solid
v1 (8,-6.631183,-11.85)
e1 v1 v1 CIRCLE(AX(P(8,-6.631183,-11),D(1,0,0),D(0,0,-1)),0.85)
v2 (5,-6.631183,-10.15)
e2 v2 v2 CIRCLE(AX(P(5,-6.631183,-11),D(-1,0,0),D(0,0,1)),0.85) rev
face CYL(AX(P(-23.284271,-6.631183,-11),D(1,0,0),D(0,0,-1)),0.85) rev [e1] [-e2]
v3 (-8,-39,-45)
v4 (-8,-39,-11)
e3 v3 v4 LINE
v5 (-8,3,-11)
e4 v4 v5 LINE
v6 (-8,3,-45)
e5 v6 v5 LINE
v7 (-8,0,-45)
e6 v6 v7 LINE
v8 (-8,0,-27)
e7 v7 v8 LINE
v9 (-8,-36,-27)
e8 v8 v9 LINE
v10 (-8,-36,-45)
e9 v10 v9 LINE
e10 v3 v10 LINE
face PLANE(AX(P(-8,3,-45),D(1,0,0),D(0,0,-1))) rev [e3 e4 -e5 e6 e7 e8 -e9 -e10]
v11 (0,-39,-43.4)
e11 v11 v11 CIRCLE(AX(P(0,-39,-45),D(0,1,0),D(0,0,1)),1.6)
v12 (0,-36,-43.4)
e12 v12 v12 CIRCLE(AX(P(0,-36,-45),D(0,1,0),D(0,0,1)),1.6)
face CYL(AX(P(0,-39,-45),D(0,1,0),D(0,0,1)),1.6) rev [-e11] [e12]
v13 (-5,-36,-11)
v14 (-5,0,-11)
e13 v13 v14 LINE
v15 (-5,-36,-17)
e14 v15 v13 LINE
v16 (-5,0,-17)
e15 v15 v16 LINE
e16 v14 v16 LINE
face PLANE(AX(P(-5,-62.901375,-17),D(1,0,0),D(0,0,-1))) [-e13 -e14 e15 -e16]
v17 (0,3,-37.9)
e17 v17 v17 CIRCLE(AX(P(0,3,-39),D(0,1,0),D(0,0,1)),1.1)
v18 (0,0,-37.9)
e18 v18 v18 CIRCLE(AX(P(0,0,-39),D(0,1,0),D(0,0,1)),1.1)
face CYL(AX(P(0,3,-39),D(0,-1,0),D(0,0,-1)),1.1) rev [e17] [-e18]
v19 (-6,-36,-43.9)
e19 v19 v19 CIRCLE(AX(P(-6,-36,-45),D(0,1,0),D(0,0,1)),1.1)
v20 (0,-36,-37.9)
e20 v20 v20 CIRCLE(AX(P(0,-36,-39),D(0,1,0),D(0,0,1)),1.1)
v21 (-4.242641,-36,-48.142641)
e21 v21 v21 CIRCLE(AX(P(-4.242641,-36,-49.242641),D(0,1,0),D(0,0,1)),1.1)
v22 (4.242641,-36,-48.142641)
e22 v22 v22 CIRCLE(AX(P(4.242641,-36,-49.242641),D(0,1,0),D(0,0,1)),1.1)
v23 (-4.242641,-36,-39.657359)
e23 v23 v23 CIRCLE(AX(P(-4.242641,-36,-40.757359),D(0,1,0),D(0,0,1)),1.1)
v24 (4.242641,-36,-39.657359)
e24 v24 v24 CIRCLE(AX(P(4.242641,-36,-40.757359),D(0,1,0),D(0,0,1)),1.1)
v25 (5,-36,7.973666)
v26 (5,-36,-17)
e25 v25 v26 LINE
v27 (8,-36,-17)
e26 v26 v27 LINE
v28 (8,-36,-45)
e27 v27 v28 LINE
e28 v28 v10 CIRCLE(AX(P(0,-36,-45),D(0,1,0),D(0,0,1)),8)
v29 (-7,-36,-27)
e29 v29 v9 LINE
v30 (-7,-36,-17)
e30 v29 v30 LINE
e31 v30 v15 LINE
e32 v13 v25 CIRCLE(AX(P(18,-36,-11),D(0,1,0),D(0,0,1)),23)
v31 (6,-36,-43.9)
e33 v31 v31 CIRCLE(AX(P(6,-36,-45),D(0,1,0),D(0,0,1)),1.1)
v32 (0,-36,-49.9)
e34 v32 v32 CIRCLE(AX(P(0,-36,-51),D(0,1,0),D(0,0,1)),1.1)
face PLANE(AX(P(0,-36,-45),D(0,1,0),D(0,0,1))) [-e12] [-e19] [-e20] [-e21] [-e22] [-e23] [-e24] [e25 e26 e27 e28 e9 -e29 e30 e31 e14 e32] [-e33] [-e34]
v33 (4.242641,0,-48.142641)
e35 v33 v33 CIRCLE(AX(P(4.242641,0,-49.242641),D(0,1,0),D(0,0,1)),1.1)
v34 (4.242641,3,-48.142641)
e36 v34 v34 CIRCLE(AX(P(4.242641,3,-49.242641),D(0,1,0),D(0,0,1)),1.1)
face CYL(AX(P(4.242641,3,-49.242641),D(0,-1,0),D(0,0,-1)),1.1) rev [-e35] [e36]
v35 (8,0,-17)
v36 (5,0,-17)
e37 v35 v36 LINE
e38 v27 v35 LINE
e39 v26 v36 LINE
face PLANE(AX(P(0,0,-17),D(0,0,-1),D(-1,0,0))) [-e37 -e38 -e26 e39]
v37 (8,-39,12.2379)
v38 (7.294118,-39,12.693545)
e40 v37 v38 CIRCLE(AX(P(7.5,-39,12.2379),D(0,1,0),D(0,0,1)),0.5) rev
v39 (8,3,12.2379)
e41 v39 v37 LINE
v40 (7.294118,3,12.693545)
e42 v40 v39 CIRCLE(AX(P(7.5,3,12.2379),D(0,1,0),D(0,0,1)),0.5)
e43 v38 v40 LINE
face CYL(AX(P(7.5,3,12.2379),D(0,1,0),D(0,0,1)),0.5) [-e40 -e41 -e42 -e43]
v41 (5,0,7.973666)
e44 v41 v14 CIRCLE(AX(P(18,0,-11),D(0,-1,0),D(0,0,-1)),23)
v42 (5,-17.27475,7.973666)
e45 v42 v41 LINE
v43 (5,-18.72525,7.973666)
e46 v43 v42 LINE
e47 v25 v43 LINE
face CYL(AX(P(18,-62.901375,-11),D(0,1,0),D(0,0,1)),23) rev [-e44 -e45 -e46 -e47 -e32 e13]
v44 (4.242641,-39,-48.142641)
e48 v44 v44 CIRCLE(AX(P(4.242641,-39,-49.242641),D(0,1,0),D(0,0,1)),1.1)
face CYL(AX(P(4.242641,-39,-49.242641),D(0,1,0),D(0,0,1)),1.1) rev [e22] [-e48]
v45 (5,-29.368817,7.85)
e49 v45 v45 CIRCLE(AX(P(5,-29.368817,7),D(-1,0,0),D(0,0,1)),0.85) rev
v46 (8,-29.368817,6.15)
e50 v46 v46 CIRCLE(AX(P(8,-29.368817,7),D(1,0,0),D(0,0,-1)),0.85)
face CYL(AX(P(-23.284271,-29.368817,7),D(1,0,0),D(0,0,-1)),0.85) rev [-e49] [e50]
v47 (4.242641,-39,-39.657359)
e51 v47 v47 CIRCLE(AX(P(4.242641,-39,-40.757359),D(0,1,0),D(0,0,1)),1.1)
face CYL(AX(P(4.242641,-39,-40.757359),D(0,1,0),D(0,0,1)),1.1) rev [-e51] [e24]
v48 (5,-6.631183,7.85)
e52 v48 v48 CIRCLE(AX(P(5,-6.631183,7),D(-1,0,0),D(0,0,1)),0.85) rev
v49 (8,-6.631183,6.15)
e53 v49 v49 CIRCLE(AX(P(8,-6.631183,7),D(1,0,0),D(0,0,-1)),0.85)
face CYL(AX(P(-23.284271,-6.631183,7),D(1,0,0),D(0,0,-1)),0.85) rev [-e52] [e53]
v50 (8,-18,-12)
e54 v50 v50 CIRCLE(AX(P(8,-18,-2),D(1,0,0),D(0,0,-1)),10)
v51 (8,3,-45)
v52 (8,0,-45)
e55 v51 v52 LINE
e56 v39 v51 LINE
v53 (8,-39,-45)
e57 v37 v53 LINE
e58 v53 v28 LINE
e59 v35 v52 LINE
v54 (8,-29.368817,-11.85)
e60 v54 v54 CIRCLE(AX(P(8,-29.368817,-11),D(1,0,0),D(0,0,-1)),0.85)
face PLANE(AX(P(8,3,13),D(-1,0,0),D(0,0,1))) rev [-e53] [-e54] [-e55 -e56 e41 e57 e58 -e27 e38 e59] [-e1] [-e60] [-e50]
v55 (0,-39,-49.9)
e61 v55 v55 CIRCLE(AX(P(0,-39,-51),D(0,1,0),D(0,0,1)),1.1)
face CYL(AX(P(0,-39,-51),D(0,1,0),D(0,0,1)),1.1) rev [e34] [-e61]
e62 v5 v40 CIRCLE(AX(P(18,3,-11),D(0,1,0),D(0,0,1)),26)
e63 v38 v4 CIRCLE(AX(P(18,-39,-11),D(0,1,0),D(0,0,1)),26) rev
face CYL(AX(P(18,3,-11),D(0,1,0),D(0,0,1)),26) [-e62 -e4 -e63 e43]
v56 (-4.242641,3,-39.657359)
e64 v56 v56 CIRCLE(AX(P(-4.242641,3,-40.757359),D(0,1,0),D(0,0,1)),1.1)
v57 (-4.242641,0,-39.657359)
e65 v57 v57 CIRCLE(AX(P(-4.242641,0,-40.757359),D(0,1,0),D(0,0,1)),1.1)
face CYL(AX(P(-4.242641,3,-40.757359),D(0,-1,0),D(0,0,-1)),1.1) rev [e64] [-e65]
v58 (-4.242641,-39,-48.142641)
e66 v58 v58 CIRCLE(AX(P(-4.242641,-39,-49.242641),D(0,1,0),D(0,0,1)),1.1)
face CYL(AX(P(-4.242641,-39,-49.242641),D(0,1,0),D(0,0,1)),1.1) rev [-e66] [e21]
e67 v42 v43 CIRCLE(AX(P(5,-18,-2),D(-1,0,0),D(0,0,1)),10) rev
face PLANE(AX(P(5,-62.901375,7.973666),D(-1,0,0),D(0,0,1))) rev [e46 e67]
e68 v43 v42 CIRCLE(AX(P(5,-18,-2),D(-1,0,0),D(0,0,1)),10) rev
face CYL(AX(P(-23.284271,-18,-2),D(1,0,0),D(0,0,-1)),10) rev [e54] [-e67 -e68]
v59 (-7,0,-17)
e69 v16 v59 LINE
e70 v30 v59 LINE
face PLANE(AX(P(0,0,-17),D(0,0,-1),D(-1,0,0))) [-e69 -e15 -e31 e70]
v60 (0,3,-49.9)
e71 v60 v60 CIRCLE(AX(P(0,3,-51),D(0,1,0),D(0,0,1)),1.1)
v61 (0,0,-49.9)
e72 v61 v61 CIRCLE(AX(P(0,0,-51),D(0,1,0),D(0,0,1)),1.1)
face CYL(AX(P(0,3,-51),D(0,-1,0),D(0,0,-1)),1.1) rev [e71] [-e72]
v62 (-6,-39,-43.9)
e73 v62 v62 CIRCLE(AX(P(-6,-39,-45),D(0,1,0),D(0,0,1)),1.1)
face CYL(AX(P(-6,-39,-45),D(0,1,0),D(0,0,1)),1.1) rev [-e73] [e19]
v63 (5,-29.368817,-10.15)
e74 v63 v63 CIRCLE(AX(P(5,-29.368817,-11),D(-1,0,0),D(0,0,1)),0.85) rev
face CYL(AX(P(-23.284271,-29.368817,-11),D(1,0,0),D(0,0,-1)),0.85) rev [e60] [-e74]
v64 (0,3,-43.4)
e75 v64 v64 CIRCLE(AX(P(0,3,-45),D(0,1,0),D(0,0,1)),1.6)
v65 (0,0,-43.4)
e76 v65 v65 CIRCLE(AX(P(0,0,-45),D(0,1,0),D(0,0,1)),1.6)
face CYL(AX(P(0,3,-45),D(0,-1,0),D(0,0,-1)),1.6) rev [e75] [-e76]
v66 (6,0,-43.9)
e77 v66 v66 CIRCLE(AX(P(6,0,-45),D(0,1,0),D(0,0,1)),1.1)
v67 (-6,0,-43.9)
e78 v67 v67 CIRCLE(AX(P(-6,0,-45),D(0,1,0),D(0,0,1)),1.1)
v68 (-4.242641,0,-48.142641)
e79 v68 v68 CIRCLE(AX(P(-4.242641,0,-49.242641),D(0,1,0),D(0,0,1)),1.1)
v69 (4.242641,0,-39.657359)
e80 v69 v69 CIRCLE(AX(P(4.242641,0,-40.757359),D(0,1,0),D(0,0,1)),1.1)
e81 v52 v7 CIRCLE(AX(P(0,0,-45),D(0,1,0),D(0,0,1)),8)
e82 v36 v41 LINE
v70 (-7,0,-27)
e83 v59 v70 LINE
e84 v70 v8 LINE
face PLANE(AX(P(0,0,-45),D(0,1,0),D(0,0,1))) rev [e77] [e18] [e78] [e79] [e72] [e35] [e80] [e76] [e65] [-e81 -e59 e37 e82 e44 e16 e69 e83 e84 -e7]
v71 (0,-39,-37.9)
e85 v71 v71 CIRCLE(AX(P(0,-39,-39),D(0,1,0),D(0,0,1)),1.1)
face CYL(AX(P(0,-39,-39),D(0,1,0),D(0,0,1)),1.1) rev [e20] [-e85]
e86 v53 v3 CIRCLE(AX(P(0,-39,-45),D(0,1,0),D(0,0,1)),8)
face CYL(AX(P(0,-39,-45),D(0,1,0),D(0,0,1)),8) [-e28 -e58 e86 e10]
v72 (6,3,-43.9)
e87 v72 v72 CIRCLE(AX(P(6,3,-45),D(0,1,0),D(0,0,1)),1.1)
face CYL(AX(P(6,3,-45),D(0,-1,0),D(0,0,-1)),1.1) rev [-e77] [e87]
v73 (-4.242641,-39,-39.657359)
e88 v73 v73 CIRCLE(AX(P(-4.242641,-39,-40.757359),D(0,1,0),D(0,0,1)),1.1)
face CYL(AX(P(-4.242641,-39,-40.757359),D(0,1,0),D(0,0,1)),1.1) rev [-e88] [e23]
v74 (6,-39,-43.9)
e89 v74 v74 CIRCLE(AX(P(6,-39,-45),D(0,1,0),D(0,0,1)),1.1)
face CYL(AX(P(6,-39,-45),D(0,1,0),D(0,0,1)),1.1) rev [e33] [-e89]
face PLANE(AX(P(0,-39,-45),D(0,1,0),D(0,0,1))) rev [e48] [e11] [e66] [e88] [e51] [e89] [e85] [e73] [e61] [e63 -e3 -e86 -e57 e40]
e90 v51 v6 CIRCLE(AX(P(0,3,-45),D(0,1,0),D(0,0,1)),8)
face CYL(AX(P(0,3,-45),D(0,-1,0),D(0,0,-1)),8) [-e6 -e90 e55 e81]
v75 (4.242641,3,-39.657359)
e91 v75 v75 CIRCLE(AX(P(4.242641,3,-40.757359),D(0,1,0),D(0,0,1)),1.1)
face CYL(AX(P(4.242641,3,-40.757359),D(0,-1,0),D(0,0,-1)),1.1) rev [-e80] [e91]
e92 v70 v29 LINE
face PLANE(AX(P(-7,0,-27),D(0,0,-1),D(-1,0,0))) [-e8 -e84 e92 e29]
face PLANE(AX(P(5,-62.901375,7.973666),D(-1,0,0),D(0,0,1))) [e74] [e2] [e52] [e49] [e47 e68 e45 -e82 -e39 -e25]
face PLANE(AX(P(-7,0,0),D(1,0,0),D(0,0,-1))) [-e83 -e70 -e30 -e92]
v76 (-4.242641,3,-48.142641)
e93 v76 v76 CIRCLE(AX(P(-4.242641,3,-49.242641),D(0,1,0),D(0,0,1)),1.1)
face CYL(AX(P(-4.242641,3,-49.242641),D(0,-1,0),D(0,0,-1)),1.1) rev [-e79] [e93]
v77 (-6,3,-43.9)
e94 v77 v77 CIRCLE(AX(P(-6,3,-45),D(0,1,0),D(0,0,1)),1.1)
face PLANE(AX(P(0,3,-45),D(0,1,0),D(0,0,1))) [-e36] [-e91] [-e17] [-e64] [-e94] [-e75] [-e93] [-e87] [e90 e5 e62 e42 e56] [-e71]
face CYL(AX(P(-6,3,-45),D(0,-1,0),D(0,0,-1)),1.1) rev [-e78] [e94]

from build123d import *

# Parameters (mm, degrees)
SKETCH_1_R          = 1.1
SKETCH_1_R_2        = 1.6
EXTRUDE_1_DEPTH     = 3
SKETCH_2_R          = 1.6
SKETCH_2_R_2        = 1.1
EXTRUDE_2_DEPTH     = 3
SKETCH_3_W          = 16
SKETCH_3_H          = 36
EXTRUDE_3_DEPTH     = 30
FILLET_1_R          = 26
SKETCH_5_W          = 10
SKETCH_5_H          = 36
EXTRUDE_4_DEPTH     = 1
CUT_EXTRUDE_2_DEPTH = 36
SKETCH_6_R          = 0.85
SKETCH_6_R_2        = 10
CUT_EXTRUDE_1_DEPTH = 3
FILLET_2_R          = 0.5


with BuildPart() as part:
    # ｽｹｯﾁ1 → ﾎﾞｽ - 押し出し1 (new body)
    with BuildSketch(Plane(origin=(0, 0, 0), x_dir=(1, 0, 0), z_dir=(0, 1, 0))):
        with BuildLine():
            Line((-8, 45), (-8, -13))
            Line((-8, -13), (8, -13))
            Line((8, -13), (8, 45))
            ThreePointArc((8, 45), (0, 53), (-8, 45))
        make_face()
        with Locations(Location((0, 51, 0), (0, 0, 270))):
            Circle(SKETCH_1_R, mode=Mode.SUBTRACT)
        with Locations(Location((4.242640687, 49.242640687, 0), (0, 0, 270))):
            Circle(SKETCH_1_R, mode=Mode.SUBTRACT)
        with Locations(Location((6, 45, 0), (0, 0, 270))):
            Circle(SKETCH_1_R, mode=Mode.SUBTRACT)
        with Locations(Location((4.242640687, 40.757359313, 0), (0, 0, 270))):
            Circle(SKETCH_1_R, mode=Mode.SUBTRACT)
        with Locations(Location((0, 39, 0), (0, 0, 270))):
            Circle(SKETCH_1_R, mode=Mode.SUBTRACT)
        with Locations(Location((-4.242640687, 40.757359313, 0), (0, 0, 270))):
            Circle(SKETCH_1_R, mode=Mode.SUBTRACT)
        with Locations(Location((-6, 45, 0), (0, 0, 270))):
            Circle(SKETCH_1_R, mode=Mode.SUBTRACT)
        with Locations(Location((-4.242640687, 49.242640687, 0), (0, 0, 270))):
            Circle(SKETCH_1_R, mode=Mode.SUBTRACT)
        with Locations(Location((0, 45, 0), (0, 0, 270))):
            Circle(SKETCH_1_R_2, mode=Mode.SUBTRACT)
    extrude(amount=EXTRUDE_1_DEPTH)



with BuildPart() as body_2:
    # ｽｹｯﾁ2 → ﾎﾞｽ - 押し出し2 (new body)
    with BuildSketch(Plane(origin=(0, -36, 0), x_dir=(1, 0, 0), z_dir=(0, 1, 0))):
        with BuildLine():
            Line((8, -13), (8, 45))
            ThreePointArc((8, 45), (0, 53), (-8, 45))
            Line((-8, 45), (-8, -13))
            Line((-8, -13), (8, -13))
        make_face()
        with Locations(Location((0, 45, 0), (0, 0, 270))):
            Circle(SKETCH_2_R, mode=Mode.SUBTRACT)
        with Locations(Location((0, 51, 0), (0, 0, 270))):
            Circle(SKETCH_2_R_2, mode=Mode.SUBTRACT)
        with Locations(Location((4.242640687, 49.242640687, 0), (0, 0, 270))):
            Circle(SKETCH_2_R_2, mode=Mode.SUBTRACT)
        with Locations(Location((6, 45, 0), (0, 0, 270))):
            Circle(SKETCH_2_R_2, mode=Mode.SUBTRACT)
        with Locations(Location((4.242640687, 40.757359313, 0), (0, 0, 270))):
            Circle(SKETCH_2_R_2, mode=Mode.SUBTRACT)
        with Locations(Location((0, 39, 0), (0, 0, 270))):
            Circle(SKETCH_2_R_2, mode=Mode.SUBTRACT)
        with Locations(Location((-4.242640687, 40.757359313, 0), (0, 0, 270))):
            Circle(SKETCH_2_R_2, mode=Mode.SUBTRACT)
        with Locations(Location((-6, 45, 0), (0, 0, 270))):
            Circle(SKETCH_2_R_2, mode=Mode.SUBTRACT)
        with Locations(Location((-4.242640687, 49.242640687, 0), (0, 0, 270))):
            Circle(SKETCH_2_R_2, mode=Mode.SUBTRACT)
    extrude(amount=-EXTRUDE_2_DEPTH)


with BuildPart() as part_1:
    add(part.part)

    add(body_2.part)  # ﾎﾞｽ - 押し出し3 merges body 2
    # ｽｹｯﾁ3 → ﾎﾞｽ - 押し出し3 (add)
    with BuildSketch(Plane.XY.offset(13)):
        with Locations((0, -18)):
            Rectangle(SKETCH_3_W, SKETCH_3_H)
    extrude(amount=-EXTRUDE_3_DEPTH)

    # ﾌｨﾚｯﾄ1
    # the kernel refuses this fillet: 26 mm, written as the material it takes off along each edge
    with BuildSketch(Plane(origin=(-8, -99, 13), x_dir=(0, 0, -1), z_dir=(0, 1, 0))) as fillet_1_piece_1:
        with BuildLine():
            CenterArc((24, -26), FILLET_1_R, 90, 67.380135052)
            Line((0, -16), (-0.48, -15.8))
            ThreePointArc((-0.48, -15.8), (-0.52, -8), (-0.52, 0))
            Line((-0.52, 0), (0, 0.52))
            Line((0, 0.52), (24, 0.52))
            Line((24, 0.52), (24, 0))
        make_face()
    extrude(amount=162, mode=Mode.SUBTRACT)

    # ｽｹｯﾁ5 → ﾎﾞｽ - 押し出し4 (add)
    with BuildSketch(Plane.ZY.offset(8)):
        with Locations((-22, -18)):
            Rectangle(SKETCH_5_W, SKETCH_5_H)
    extrude(amount=-EXTRUDE_4_DEPTH)

    # ｽｹｯﾁ7 → ｶｯﾄ - 押し出し2 (cut)
    with BuildSketch(Plane.XZ):
        with BuildLine():
            Line((5, 7.973665961), (5, -17))
            Line((5, -17), (-5, -17))
            Line((-5, -17), (-5, -11))
            ThreePointArc((-5, -11), (-2.346989949, -0.276194705), (5, 7.973665961))
        make_face()
    extrude(amount=CUT_EXTRUDE_2_DEPTH, mode=Mode.SUBTRACT)

    # ｽｹｯﾁ6 → ｶｯﾄ - 押し出し1 (cut)
    with BuildSketch(Plane(origin=(8, 0, 0), x_dir=(0, 0, -1), z_dir=(1, 0, 0))):
        with Locations((11, -6.631182999)):
            Circle(SKETCH_6_R)
        with Locations((-7, -6.631182999)):
            Circle(SKETCH_6_R)
        with Locations((-7, -29.368817001)):
            Circle(SKETCH_6_R)
        with Locations((11, -29.368817001)):
            Circle(SKETCH_6_R)
        with Locations((2, -18)):
            Circle(SKETCH_6_R_2)
    extrude(amount=-CUT_EXTRUDE_1_DEPTH, mode=Mode.SUBTRACT)

    # ﾌｨﾚｯﾄ2
    fillet_2_edges = [part_1.edges().sort_by_distance(p)[0] for p in [
        (8, -18, 13),
    ]]
    fillet(fillet_2_edges, radius=FILLET_2_R)


solid = part_1.part
